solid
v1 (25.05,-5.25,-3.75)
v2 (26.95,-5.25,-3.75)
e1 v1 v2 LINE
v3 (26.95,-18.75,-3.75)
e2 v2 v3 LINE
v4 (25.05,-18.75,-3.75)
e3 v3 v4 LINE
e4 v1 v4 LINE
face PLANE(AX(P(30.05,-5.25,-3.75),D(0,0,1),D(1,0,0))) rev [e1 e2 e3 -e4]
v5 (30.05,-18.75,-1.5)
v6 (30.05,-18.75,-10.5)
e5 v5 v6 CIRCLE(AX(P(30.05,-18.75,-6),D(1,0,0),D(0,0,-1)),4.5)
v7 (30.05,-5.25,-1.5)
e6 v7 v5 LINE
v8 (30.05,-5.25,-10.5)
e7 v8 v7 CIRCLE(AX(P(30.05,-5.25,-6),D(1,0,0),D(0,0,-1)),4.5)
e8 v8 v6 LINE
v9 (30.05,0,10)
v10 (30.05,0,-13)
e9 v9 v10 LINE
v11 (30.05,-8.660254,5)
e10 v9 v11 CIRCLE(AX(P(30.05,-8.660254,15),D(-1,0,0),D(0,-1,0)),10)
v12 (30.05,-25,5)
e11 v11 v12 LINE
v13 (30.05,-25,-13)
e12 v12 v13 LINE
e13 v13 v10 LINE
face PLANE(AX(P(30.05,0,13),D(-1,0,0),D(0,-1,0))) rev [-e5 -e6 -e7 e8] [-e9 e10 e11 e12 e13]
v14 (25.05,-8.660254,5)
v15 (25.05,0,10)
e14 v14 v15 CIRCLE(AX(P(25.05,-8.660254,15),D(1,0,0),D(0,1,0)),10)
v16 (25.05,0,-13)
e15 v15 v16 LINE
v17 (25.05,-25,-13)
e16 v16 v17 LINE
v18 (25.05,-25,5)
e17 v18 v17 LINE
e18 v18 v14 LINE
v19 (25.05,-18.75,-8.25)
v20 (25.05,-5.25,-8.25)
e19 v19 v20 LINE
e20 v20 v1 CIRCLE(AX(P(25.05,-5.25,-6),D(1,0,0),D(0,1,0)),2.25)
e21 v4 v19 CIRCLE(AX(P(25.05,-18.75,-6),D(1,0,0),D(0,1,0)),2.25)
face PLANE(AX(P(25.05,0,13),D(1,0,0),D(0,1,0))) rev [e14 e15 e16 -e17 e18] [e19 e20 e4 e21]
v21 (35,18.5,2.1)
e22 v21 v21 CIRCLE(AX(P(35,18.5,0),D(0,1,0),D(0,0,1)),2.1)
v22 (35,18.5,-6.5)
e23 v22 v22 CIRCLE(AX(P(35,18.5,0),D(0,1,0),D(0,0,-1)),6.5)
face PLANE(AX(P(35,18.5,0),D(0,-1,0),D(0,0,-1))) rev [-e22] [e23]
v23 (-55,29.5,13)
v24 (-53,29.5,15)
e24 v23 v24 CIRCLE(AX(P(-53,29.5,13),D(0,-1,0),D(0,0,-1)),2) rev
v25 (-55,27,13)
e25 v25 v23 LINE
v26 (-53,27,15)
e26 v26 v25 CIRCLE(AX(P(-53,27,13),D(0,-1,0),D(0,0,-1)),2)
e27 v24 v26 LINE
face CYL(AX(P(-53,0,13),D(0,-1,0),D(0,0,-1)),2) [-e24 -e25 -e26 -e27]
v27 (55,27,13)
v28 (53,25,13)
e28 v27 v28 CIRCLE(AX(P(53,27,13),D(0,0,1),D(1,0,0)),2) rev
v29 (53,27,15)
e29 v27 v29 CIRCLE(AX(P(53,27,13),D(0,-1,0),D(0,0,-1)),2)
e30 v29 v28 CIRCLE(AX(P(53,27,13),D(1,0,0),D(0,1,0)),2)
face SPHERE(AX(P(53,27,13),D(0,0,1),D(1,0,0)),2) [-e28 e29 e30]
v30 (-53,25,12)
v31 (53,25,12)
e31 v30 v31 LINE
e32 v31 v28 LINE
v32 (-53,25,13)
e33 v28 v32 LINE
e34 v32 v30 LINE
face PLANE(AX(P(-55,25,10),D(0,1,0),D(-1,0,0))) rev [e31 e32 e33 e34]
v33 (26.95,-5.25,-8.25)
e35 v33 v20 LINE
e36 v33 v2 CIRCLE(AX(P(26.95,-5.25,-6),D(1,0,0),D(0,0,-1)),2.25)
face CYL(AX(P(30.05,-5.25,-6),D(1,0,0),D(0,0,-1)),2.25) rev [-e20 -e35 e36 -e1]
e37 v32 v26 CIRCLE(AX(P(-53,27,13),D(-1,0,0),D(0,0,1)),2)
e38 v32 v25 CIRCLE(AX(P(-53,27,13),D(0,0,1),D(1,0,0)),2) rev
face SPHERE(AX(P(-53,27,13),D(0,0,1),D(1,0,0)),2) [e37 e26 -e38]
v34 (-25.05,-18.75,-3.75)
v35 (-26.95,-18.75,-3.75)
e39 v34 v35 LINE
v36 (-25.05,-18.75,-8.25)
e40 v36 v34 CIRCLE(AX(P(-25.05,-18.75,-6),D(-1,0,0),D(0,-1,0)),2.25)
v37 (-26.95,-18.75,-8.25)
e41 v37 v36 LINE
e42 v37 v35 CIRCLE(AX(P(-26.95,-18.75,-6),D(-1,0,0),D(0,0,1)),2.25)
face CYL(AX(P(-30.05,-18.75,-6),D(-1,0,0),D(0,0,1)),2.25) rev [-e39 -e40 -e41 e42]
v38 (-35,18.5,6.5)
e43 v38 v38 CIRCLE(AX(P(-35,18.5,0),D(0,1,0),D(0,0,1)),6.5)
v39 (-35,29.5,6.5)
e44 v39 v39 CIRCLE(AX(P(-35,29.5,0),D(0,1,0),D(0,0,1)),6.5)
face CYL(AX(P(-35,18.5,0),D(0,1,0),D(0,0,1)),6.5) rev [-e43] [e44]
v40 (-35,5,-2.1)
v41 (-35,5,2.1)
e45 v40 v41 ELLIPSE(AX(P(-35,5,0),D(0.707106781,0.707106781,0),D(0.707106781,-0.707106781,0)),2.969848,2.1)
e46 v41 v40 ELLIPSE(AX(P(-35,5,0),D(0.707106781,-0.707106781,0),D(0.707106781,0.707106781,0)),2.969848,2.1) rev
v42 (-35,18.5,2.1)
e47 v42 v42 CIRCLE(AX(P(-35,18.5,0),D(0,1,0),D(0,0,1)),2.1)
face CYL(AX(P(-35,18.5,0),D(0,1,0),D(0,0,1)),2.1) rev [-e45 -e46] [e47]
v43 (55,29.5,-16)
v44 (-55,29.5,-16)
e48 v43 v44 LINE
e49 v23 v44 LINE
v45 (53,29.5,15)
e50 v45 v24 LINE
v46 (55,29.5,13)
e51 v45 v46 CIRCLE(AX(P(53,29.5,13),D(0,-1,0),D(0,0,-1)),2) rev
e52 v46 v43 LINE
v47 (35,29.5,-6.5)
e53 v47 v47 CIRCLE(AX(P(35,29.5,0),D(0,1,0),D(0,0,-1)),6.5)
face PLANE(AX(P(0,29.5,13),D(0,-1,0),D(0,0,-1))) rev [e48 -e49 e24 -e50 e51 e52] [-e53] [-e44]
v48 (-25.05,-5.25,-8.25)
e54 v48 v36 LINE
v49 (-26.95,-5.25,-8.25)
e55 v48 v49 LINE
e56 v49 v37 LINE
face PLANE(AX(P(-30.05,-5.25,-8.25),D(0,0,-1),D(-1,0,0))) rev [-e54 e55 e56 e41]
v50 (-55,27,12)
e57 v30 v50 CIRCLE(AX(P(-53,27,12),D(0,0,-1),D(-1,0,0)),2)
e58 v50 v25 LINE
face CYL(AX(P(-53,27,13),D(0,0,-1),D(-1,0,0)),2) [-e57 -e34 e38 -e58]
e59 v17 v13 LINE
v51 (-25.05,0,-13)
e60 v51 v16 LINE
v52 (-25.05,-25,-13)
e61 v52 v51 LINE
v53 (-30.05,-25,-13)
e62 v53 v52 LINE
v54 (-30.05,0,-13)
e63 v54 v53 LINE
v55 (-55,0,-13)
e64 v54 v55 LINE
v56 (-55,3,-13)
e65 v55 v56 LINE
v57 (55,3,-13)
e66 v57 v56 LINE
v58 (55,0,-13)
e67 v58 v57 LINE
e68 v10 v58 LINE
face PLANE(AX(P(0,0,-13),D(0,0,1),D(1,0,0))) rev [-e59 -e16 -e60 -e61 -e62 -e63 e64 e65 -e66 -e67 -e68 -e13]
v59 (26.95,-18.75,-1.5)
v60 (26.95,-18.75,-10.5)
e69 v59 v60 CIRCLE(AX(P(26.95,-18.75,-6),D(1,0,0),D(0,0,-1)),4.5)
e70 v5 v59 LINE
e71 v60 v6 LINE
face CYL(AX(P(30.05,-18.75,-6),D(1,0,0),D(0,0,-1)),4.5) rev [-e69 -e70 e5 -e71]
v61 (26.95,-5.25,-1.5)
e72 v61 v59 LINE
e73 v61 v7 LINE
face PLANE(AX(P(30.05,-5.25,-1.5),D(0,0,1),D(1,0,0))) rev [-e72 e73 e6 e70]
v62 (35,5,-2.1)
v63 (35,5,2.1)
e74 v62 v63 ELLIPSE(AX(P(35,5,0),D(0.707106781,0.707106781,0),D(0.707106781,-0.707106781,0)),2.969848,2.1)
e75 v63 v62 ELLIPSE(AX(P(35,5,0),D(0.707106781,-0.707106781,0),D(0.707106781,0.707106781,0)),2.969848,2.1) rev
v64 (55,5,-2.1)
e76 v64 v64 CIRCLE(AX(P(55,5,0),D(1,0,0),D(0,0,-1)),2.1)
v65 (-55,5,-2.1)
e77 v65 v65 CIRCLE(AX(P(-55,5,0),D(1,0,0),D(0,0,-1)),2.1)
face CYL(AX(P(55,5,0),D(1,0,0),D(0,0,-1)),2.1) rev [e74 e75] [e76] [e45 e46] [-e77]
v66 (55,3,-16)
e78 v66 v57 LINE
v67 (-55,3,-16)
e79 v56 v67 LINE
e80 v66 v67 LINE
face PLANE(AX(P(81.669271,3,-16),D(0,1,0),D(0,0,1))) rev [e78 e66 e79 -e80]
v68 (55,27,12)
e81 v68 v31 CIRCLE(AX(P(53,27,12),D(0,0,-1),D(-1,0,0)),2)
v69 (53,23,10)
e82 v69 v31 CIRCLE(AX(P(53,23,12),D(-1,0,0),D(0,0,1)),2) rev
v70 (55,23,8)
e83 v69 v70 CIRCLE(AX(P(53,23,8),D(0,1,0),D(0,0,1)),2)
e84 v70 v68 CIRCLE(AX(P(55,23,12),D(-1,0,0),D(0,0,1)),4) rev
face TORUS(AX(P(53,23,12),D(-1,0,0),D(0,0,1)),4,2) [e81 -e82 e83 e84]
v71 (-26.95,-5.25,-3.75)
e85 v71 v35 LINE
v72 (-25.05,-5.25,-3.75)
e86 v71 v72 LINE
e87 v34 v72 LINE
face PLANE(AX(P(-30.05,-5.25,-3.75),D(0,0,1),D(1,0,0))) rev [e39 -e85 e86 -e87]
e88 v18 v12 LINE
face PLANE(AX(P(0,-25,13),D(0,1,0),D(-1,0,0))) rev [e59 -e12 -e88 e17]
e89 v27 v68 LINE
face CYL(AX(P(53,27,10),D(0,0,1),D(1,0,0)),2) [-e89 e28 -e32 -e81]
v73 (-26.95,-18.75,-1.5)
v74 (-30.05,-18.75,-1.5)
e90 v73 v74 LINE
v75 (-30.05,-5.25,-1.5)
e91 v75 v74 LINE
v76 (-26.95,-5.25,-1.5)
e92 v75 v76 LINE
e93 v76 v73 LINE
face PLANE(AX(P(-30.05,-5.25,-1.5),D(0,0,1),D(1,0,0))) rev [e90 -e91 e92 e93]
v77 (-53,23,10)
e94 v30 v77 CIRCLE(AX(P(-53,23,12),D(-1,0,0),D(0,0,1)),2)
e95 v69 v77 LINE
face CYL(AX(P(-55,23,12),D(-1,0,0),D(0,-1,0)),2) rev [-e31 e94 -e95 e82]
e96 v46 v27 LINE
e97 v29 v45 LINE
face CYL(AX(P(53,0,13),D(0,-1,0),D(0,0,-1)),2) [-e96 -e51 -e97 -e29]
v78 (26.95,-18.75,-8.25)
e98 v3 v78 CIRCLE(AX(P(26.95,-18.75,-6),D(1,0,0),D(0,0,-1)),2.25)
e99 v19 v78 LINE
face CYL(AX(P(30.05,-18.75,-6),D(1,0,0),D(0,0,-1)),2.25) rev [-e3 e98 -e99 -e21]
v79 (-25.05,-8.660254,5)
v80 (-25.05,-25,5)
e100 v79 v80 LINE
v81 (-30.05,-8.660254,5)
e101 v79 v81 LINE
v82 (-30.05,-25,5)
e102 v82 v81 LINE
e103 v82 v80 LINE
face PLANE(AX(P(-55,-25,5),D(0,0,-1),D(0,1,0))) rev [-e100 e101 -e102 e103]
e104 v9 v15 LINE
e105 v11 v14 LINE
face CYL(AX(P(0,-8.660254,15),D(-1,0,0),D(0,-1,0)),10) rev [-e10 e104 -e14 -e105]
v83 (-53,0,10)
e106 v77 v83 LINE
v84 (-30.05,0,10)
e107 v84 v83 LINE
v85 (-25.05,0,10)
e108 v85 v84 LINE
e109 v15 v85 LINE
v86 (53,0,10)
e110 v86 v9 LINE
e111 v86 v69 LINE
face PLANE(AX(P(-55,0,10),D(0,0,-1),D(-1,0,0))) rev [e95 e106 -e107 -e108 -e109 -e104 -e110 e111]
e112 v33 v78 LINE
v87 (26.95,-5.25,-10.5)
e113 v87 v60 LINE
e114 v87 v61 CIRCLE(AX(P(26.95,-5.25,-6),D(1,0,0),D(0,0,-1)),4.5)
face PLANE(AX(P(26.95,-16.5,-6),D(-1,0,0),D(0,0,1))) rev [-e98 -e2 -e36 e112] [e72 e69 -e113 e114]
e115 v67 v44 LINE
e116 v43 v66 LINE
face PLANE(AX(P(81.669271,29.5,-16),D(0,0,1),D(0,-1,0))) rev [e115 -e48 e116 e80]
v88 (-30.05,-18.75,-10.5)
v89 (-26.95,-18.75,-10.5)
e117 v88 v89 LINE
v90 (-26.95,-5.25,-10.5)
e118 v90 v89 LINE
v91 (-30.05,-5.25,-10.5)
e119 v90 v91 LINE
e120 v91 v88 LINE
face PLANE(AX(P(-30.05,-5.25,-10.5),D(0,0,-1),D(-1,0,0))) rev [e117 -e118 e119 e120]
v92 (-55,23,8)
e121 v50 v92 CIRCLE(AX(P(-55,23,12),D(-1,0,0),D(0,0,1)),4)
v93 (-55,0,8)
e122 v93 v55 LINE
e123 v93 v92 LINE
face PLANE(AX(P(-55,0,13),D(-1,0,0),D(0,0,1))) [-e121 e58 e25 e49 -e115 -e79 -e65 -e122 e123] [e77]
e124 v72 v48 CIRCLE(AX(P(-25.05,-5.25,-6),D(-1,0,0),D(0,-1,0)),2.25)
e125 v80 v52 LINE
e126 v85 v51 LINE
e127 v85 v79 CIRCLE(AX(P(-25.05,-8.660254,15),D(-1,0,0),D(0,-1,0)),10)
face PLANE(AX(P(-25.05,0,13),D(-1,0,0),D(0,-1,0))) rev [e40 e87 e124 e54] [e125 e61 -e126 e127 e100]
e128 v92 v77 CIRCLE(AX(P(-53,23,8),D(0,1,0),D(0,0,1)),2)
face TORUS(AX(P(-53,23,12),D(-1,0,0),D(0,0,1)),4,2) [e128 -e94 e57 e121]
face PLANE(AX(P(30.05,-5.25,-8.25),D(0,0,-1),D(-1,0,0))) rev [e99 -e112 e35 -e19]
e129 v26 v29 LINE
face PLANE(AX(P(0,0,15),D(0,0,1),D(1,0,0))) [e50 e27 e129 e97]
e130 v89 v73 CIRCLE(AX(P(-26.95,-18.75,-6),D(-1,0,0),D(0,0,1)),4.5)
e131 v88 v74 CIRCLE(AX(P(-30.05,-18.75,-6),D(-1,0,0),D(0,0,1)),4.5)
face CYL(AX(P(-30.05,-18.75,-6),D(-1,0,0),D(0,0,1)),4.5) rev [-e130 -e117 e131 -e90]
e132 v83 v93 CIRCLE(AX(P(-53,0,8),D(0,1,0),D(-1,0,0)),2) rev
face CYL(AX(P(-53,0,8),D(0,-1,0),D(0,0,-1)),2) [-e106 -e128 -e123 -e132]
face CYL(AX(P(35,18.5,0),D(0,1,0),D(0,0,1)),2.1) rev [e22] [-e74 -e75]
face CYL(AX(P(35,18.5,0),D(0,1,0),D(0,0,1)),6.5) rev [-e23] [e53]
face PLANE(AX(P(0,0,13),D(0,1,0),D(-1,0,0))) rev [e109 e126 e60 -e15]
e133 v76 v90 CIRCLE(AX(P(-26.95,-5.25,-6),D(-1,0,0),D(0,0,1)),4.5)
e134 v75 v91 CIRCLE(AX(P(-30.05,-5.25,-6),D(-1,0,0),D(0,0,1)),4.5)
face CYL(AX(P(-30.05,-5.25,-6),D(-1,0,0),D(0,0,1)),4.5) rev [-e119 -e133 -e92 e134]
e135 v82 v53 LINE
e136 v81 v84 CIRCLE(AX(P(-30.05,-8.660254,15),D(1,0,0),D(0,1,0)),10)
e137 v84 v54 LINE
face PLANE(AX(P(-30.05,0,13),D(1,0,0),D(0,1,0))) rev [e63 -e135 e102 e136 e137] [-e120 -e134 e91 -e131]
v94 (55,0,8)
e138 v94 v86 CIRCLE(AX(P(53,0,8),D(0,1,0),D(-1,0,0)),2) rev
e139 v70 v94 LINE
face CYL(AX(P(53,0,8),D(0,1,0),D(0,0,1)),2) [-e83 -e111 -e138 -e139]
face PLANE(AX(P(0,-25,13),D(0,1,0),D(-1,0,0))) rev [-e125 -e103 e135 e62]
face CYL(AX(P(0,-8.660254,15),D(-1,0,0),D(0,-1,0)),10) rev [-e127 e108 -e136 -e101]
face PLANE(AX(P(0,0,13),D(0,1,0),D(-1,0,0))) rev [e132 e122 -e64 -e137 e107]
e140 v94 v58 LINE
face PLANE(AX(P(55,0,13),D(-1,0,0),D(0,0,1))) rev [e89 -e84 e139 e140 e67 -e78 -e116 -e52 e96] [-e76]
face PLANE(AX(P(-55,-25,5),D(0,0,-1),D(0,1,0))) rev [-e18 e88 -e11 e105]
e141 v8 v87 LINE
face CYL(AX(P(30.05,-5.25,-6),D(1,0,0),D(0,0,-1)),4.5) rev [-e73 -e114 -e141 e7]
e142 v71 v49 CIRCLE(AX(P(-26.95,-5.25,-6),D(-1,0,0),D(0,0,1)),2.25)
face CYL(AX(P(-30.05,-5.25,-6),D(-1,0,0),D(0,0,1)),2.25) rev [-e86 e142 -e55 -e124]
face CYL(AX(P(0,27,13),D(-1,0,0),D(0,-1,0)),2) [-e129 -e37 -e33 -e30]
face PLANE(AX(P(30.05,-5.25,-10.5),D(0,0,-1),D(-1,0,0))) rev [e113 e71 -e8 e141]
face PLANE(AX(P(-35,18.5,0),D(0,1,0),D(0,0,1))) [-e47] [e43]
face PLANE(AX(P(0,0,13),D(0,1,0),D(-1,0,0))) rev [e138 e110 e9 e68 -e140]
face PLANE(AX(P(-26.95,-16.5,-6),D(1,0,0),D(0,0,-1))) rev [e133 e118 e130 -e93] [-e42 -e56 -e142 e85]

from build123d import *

# Parameters (mm, degrees)
AUFSATZ_LINEAR_AUSTRAGEN2_DEPTH                = 13
STIRNSENKUNG_START                             = 26.95
STIRNSENKUNG_LANGLOCH_F_R_M4_FLACHKOPFSC_DEPTH = 3.1
STIRNSENKUNG_START_2                           = 25.05
STIRNSENKUNG_LANGLOCH_F_R_M4_FLACHKO_3_DEPTH   = 1.9
SCHNITT_LINEAR_AUSTRAGEN1_DEPTH                = 91.954672777
SCHNITT_LINEAR_AUSTRAGEN1_DEPTH_BACK           = 91.954672777
VERRUNDUNG1_R                                  = 10
AUFSATZ_LINEAR_AUSTRAGEN4_REACH                = 65.751
SKIZZE9_W                                      = 3
SKIZZE9_H                                      = 26.5
AUFSATZ_LINEAR_AUSTRAGEN4_DIRECTION_2_REACH    = 65.751
SKIZZE18_W                                     = 110
SKIZZE18_H                                     = 4.5
AUFSATZ_LINEAR_AUSTRAGEN5_DEPTH                = 2
F_4_2_4_2_DURCHMESSER_BOHRUNG1_D               = 4.2
SKIZZE19_R                                     = 6.5
SCHNITT_LINEAR_AUSTRAGEN2_DEPTH                = 11
M5_GEWINDEBOHRUNG1_REACH                       = 73.925
M5_GEWINDEBOHRUNG1_BORE_R                      = 2.1
VERRUNDUNG2_R                                  = 2


# Read off the part's stored shape, not the designer's step: Stirnsenkung Langloch für M4 Flachkopfschraube mit Schlitz12
with BuildPart() as part:
    # Skizze2 → Aufsatz-Linear austragen2 (new, symmetric)
    with BuildSketch(Plane.XY):
        Polygon((-25.05, -25), (-25.05, 0), (25.05, 0), (25.05, -25), (30.05, -25), (30.05, 0), (55, 0), (55, 29.5), (-55, 29.5), (-55, 0), (-30.05, 0), (-30.05, -25), align=None)
    extrude(amount=AUFSATZ_LINEAR_AUSTRAGEN2_DEPTH, both=True)

    # Stirnsenkung Langloch f_r M4 Flachko 2 → Stirnsenkung Langloch für M4 Flachkopfschraube mit Schlitz12 (cut)
    with BuildSketch(Plane.YZ.offset(STIRNSENKUNG_START)):
        with BuildLine():
            Line((-5.25, -1.5), (-18.75, -1.5))
            ThreePointArc((-18.75, -1.5), (-23.25, -6), (-18.75, -10.5))
            Line((-18.75, -10.5), (-5.25, -10.5))
            ThreePointArc((-5.25, -10.5), (-0.75, -6), (-5.25, -1.5))
        make_face()
    stirnsenkung_langloch_f_r_m4_flachkopfsc = extrude(amount=STIRNSENKUNG_LANGLOCH_F_R_M4_FLACHKOPFSC_DEPTH, mode=Mode.SUBTRACT)

    # Stirnsenkung Langloch f_r M4 Flachko 3 o → Stirnsenkung Langloch f_r M4 Flachko 3 (cut)
    with BuildSketch(Plane.YZ.offset(STIRNSENKUNG_START_2)):
        with BuildLine():
            Line((-5.25, -3.75), (-18.75, -3.75))
            ThreePointArc((-18.75, -3.75), (-21, -6), (-18.75, -8.25))
            Line((-18.75, -8.25), (-5.25, -8.25))
            ThreePointArc((-5.25, -8.25), (-3, -6), (-5.25, -3.75))
        make_face()
    stirnsenkung_langloch_f_r_m4_flachko_3 = extrude(amount=STIRNSENKUNG_LANGLOCH_F_R_M4_FLACHKO_3_DEPTH, mode=Mode.SUBTRACT)

    # Skizze5 → Schnitt-Linear austragen1 (cut, two sides: drawn at the far end of the back side and taken through both)
    with BuildSketch(Plane(origin=(30.05, 0, 0), x_dir=(0, 0, -1), z_dir=(1, 0, 0)).offset(-SCHNITT_LINEAR_AUSTRAGEN1_DEPTH_BACK)):
        Polygon((-10, 0), (-10, 25), (-13, 25), (-13, -25), (-5, -25), (-5, 0), align=None)
    extrude(amount=SCHNITT_LINEAR_AUSTRAGEN1_DEPTH + SCHNITT_LINEAR_AUSTRAGEN1_DEPTH_BACK, mode=Mode.SUBTRACT)

    # Verrundung1
    # the kernel refuses this fillet: 10 mm, written as the material it adds along each edge
    with BuildSketch(Plane(origin=(-25.05, 0, 5), x_dir=(0, 0, 1), z_dir=(-1, 0, 0))) as verrundung1_piece_1:
        with BuildLine():
            CenterArc((10, -8.660254038), VERRUNDUNG1_R, 120, 60)
            Line((0, -8.660254038), (-0.2, -8.660254038))
            Line((-0.2, -8.660254038), (-0.2, 0))
            Line((-0.2, 0), (0, 0.2))
            ThreePointArc((0, 0.2), (2.5, 0.2), (4.9, 0.173205081))
            Line((4.9, 0.173205081), (5, 0))
        make_face()
    extrude(amount=5)
    with BuildSketch(Plane(origin=(30.05, 0, 5), x_dir=(0, -1, 0), z_dir=(-1, 0, 0))) as verrundung1_piece_2:
        with BuildLine():
            CenterArc((8.660254038, 10), VERRUNDUNG1_R, 210, 60)
            Line((0, 5), (-0.173205081, 4.9))
            ThreePointArc((-0.173205081, 4.9), (-0.2, 2.5), (-0.2, 0))
            Line((-0.2, 0), (0, -0.2))
            Line((0, -0.2), (8.660254038, -0.2))
            Line((8.660254038, -0.2), (8.660254038, 0))
        make_face()
    extrude(amount=5)

    # Aufsatz-Linear austragen4: up to this face of the body (flat: up to its plane)
    aufsatz_linear_austragen4_end = Plane(part.part.faces().sort_by_distance((55, 14.993858382, -1.246387283))[0])
    # Skizze9 → Aufsatz-Linear austragen4 (add, up to the picked face)
    with BuildSketch(Plane(origin=(0, 0, 0), x_dir=(0, 0, -1), z_dir=(1, 0, 0)), mode=Mode.PRIVATE) as aufsatz_linear_austragen4_sk1:
        with Locations((14.5, 16.25)):
            Rectangle(SKIZZE9_W, SKIZZE9_H)
    aufsatz_linear_austragen4_tool1 = split(extrude(aufsatz_linear_austragen4_sk1.sketch, amount=AUFSATZ_LINEAR_AUSTRAGEN4_REACH, mode=Mode.PRIVATE), bisect_by=aufsatz_linear_austragen4_end, keep=Keep.BOTH, mode=Mode.PRIVATE)
    add(aufsatz_linear_austragen4_tool1.solids().sort_by(Axis((0, 16.25, -14.5), (1, 0, 0)))[0])

    # Aufsatz-Linear austragen4 direction 2: up to this face of the body (flat: up to its plane)
    aufsatz_linear_austragen4_direction_2_end = Plane(part.part.faces().sort_by_distance((-55, 14.993858382, -1.246387283))[0])
    # Skizze9 → Aufsatz-Linear austragen4 direction 2 (add, up to the picked face)
    with BuildSketch(Plane(origin=(0, 0, 0), x_dir=(0, 0, -1), z_dir=(1, 0, 0)), mode=Mode.PRIVATE) as aufsatz_linear_austragen4_direction_2_sk1:
        with Locations((14.5, 16.25)):
            Rectangle(SKIZZE9_W, SKIZZE9_H)
    aufsatz_linear_austragen4_direction_2_tool1 = split(extrude(aufsatz_linear_austragen4_direction_2_sk1.sketch, amount=-AUFSATZ_LINEAR_AUSTRAGEN4_DIRECTION_2_REACH, mode=Mode.PRIVATE), bisect_by=aufsatz_linear_austragen4_direction_2_end, keep=Keep.BOTH, mode=Mode.PRIVATE)
    add(aufsatz_linear_austragen4_direction_2_tool1.solids().sort_by(Axis((0, 16.25, -14.5), (-1, 0, 0)))[0])

    # Skizze18 → Aufsatz-Linear austragen5 (add)
    with BuildSketch(Plane.XY.offset(13)):
        with Locations((0, 27.25)):
            Rectangle(SKIZZE18_W, SKIZZE18_H)
    extrude(amount=AUFSATZ_LINEAR_AUSTRAGEN5_DEPTH)

    # Ø4.2 (4.2) Durchmesser Bohrung1 (through all)
    with Locations(Plane(origin=(55, 0, 0), x_dir=(0, 0, -1), z_dir=(1, 0, 0))):
        with Locations((0, 5)):
            Hole(F_4_2_4_2_DURCHMESSER_BOHRUNG1_D / 2)

    # Spiegeln2: Stirnsenkung Langloch für M4 Flachkopfschraube mit Schlitz12, Stirnsenkung Langloch f_r M4 Flachko 3 across plane
    add(stirnsenkung_langloch_f_r_m4_flachkopfsc.mirror(Plane(origin=(0, 0, 0), x_dir=(0, 0, 1), z_dir=(1, 0, 0))), mode=Mode.SUBTRACT)
    add(stirnsenkung_langloch_f_r_m4_flachko_3.mirror(Plane(origin=(0, 0, 0), x_dir=(0, 0, 1), z_dir=(1, 0, 0))), mode=Mode.SUBTRACT)

    # Skizze19 → Schnitt-Linear austragen2 (cut)
    with BuildSketch(Plane(origin=(0, 29.5, 0), x_dir=(1, 0, 0), z_dir=(0, 1, 0))):
        with Locations(Location((-35, 0, 0), (0, 0, 270))):
            Circle(SKIZZE19_R)
        with Locations(Location((35, 0, 0), (0, 0, 90))):
            Circle(SKIZZE19_R)
    extrude(amount=-SCHNITT_LINEAR_AUSTRAGEN2_DEPTH, mode=Mode.SUBTRACT)

    # M5 Gewindebohrung1 bore → M5 Gewindebohrung1 (cut, up to next)
    with BuildSketch(Plane(origin=(0, 18.5, 0), x_dir=(1, 0, 0), z_dir=(0, 1, 0)), mode=Mode.PRIVATE) as m5_gewindebohrung1_sk1:
        with Locations((-35, 0)):
            Circle(M5_GEWINDEBOHRUNG1_BORE_R)
    m5_gewindebohrung1_tool1 = extrude(m5_gewindebohrung1_sk1.sketch, amount=-M5_GEWINDEBOHRUNG1_REACH, mode=Mode.PRIVATE) & part.part
    m5_gewindebohrung1 = m5_gewindebohrung1_tool1.solids().sort_by_distance((-35, 18.5, 0))[0]
    add(m5_gewindebohrung1, mode=Mode.SUBTRACT)

    # Verrundung2
    verrundung2_edges = [part.edges().sort_by_distance(p)[0] for p in [
        (-55, 27.25, 15),
        (0, 25, 15),
        (55, 27.25, 15),
        (55, 12.5, 10),
        (55, 25, 12.5),
        (-55, 25, 12.5),
        (0, 25, 10),
        (-55, 12.5, 10),
    ]]
    fillet(verrundung2_edges, radius=VERRUNDUNG2_R)

    # Spiegeln3: M5 Gewindebohrung1 across plane
    add(m5_gewindebohrung1.mirror(Plane(origin=(0, 0, 0), x_dir=(0, 0, 1), z_dir=(1, 0, 0))), mode=Mode.SUBTRACT)


solid = part.part
